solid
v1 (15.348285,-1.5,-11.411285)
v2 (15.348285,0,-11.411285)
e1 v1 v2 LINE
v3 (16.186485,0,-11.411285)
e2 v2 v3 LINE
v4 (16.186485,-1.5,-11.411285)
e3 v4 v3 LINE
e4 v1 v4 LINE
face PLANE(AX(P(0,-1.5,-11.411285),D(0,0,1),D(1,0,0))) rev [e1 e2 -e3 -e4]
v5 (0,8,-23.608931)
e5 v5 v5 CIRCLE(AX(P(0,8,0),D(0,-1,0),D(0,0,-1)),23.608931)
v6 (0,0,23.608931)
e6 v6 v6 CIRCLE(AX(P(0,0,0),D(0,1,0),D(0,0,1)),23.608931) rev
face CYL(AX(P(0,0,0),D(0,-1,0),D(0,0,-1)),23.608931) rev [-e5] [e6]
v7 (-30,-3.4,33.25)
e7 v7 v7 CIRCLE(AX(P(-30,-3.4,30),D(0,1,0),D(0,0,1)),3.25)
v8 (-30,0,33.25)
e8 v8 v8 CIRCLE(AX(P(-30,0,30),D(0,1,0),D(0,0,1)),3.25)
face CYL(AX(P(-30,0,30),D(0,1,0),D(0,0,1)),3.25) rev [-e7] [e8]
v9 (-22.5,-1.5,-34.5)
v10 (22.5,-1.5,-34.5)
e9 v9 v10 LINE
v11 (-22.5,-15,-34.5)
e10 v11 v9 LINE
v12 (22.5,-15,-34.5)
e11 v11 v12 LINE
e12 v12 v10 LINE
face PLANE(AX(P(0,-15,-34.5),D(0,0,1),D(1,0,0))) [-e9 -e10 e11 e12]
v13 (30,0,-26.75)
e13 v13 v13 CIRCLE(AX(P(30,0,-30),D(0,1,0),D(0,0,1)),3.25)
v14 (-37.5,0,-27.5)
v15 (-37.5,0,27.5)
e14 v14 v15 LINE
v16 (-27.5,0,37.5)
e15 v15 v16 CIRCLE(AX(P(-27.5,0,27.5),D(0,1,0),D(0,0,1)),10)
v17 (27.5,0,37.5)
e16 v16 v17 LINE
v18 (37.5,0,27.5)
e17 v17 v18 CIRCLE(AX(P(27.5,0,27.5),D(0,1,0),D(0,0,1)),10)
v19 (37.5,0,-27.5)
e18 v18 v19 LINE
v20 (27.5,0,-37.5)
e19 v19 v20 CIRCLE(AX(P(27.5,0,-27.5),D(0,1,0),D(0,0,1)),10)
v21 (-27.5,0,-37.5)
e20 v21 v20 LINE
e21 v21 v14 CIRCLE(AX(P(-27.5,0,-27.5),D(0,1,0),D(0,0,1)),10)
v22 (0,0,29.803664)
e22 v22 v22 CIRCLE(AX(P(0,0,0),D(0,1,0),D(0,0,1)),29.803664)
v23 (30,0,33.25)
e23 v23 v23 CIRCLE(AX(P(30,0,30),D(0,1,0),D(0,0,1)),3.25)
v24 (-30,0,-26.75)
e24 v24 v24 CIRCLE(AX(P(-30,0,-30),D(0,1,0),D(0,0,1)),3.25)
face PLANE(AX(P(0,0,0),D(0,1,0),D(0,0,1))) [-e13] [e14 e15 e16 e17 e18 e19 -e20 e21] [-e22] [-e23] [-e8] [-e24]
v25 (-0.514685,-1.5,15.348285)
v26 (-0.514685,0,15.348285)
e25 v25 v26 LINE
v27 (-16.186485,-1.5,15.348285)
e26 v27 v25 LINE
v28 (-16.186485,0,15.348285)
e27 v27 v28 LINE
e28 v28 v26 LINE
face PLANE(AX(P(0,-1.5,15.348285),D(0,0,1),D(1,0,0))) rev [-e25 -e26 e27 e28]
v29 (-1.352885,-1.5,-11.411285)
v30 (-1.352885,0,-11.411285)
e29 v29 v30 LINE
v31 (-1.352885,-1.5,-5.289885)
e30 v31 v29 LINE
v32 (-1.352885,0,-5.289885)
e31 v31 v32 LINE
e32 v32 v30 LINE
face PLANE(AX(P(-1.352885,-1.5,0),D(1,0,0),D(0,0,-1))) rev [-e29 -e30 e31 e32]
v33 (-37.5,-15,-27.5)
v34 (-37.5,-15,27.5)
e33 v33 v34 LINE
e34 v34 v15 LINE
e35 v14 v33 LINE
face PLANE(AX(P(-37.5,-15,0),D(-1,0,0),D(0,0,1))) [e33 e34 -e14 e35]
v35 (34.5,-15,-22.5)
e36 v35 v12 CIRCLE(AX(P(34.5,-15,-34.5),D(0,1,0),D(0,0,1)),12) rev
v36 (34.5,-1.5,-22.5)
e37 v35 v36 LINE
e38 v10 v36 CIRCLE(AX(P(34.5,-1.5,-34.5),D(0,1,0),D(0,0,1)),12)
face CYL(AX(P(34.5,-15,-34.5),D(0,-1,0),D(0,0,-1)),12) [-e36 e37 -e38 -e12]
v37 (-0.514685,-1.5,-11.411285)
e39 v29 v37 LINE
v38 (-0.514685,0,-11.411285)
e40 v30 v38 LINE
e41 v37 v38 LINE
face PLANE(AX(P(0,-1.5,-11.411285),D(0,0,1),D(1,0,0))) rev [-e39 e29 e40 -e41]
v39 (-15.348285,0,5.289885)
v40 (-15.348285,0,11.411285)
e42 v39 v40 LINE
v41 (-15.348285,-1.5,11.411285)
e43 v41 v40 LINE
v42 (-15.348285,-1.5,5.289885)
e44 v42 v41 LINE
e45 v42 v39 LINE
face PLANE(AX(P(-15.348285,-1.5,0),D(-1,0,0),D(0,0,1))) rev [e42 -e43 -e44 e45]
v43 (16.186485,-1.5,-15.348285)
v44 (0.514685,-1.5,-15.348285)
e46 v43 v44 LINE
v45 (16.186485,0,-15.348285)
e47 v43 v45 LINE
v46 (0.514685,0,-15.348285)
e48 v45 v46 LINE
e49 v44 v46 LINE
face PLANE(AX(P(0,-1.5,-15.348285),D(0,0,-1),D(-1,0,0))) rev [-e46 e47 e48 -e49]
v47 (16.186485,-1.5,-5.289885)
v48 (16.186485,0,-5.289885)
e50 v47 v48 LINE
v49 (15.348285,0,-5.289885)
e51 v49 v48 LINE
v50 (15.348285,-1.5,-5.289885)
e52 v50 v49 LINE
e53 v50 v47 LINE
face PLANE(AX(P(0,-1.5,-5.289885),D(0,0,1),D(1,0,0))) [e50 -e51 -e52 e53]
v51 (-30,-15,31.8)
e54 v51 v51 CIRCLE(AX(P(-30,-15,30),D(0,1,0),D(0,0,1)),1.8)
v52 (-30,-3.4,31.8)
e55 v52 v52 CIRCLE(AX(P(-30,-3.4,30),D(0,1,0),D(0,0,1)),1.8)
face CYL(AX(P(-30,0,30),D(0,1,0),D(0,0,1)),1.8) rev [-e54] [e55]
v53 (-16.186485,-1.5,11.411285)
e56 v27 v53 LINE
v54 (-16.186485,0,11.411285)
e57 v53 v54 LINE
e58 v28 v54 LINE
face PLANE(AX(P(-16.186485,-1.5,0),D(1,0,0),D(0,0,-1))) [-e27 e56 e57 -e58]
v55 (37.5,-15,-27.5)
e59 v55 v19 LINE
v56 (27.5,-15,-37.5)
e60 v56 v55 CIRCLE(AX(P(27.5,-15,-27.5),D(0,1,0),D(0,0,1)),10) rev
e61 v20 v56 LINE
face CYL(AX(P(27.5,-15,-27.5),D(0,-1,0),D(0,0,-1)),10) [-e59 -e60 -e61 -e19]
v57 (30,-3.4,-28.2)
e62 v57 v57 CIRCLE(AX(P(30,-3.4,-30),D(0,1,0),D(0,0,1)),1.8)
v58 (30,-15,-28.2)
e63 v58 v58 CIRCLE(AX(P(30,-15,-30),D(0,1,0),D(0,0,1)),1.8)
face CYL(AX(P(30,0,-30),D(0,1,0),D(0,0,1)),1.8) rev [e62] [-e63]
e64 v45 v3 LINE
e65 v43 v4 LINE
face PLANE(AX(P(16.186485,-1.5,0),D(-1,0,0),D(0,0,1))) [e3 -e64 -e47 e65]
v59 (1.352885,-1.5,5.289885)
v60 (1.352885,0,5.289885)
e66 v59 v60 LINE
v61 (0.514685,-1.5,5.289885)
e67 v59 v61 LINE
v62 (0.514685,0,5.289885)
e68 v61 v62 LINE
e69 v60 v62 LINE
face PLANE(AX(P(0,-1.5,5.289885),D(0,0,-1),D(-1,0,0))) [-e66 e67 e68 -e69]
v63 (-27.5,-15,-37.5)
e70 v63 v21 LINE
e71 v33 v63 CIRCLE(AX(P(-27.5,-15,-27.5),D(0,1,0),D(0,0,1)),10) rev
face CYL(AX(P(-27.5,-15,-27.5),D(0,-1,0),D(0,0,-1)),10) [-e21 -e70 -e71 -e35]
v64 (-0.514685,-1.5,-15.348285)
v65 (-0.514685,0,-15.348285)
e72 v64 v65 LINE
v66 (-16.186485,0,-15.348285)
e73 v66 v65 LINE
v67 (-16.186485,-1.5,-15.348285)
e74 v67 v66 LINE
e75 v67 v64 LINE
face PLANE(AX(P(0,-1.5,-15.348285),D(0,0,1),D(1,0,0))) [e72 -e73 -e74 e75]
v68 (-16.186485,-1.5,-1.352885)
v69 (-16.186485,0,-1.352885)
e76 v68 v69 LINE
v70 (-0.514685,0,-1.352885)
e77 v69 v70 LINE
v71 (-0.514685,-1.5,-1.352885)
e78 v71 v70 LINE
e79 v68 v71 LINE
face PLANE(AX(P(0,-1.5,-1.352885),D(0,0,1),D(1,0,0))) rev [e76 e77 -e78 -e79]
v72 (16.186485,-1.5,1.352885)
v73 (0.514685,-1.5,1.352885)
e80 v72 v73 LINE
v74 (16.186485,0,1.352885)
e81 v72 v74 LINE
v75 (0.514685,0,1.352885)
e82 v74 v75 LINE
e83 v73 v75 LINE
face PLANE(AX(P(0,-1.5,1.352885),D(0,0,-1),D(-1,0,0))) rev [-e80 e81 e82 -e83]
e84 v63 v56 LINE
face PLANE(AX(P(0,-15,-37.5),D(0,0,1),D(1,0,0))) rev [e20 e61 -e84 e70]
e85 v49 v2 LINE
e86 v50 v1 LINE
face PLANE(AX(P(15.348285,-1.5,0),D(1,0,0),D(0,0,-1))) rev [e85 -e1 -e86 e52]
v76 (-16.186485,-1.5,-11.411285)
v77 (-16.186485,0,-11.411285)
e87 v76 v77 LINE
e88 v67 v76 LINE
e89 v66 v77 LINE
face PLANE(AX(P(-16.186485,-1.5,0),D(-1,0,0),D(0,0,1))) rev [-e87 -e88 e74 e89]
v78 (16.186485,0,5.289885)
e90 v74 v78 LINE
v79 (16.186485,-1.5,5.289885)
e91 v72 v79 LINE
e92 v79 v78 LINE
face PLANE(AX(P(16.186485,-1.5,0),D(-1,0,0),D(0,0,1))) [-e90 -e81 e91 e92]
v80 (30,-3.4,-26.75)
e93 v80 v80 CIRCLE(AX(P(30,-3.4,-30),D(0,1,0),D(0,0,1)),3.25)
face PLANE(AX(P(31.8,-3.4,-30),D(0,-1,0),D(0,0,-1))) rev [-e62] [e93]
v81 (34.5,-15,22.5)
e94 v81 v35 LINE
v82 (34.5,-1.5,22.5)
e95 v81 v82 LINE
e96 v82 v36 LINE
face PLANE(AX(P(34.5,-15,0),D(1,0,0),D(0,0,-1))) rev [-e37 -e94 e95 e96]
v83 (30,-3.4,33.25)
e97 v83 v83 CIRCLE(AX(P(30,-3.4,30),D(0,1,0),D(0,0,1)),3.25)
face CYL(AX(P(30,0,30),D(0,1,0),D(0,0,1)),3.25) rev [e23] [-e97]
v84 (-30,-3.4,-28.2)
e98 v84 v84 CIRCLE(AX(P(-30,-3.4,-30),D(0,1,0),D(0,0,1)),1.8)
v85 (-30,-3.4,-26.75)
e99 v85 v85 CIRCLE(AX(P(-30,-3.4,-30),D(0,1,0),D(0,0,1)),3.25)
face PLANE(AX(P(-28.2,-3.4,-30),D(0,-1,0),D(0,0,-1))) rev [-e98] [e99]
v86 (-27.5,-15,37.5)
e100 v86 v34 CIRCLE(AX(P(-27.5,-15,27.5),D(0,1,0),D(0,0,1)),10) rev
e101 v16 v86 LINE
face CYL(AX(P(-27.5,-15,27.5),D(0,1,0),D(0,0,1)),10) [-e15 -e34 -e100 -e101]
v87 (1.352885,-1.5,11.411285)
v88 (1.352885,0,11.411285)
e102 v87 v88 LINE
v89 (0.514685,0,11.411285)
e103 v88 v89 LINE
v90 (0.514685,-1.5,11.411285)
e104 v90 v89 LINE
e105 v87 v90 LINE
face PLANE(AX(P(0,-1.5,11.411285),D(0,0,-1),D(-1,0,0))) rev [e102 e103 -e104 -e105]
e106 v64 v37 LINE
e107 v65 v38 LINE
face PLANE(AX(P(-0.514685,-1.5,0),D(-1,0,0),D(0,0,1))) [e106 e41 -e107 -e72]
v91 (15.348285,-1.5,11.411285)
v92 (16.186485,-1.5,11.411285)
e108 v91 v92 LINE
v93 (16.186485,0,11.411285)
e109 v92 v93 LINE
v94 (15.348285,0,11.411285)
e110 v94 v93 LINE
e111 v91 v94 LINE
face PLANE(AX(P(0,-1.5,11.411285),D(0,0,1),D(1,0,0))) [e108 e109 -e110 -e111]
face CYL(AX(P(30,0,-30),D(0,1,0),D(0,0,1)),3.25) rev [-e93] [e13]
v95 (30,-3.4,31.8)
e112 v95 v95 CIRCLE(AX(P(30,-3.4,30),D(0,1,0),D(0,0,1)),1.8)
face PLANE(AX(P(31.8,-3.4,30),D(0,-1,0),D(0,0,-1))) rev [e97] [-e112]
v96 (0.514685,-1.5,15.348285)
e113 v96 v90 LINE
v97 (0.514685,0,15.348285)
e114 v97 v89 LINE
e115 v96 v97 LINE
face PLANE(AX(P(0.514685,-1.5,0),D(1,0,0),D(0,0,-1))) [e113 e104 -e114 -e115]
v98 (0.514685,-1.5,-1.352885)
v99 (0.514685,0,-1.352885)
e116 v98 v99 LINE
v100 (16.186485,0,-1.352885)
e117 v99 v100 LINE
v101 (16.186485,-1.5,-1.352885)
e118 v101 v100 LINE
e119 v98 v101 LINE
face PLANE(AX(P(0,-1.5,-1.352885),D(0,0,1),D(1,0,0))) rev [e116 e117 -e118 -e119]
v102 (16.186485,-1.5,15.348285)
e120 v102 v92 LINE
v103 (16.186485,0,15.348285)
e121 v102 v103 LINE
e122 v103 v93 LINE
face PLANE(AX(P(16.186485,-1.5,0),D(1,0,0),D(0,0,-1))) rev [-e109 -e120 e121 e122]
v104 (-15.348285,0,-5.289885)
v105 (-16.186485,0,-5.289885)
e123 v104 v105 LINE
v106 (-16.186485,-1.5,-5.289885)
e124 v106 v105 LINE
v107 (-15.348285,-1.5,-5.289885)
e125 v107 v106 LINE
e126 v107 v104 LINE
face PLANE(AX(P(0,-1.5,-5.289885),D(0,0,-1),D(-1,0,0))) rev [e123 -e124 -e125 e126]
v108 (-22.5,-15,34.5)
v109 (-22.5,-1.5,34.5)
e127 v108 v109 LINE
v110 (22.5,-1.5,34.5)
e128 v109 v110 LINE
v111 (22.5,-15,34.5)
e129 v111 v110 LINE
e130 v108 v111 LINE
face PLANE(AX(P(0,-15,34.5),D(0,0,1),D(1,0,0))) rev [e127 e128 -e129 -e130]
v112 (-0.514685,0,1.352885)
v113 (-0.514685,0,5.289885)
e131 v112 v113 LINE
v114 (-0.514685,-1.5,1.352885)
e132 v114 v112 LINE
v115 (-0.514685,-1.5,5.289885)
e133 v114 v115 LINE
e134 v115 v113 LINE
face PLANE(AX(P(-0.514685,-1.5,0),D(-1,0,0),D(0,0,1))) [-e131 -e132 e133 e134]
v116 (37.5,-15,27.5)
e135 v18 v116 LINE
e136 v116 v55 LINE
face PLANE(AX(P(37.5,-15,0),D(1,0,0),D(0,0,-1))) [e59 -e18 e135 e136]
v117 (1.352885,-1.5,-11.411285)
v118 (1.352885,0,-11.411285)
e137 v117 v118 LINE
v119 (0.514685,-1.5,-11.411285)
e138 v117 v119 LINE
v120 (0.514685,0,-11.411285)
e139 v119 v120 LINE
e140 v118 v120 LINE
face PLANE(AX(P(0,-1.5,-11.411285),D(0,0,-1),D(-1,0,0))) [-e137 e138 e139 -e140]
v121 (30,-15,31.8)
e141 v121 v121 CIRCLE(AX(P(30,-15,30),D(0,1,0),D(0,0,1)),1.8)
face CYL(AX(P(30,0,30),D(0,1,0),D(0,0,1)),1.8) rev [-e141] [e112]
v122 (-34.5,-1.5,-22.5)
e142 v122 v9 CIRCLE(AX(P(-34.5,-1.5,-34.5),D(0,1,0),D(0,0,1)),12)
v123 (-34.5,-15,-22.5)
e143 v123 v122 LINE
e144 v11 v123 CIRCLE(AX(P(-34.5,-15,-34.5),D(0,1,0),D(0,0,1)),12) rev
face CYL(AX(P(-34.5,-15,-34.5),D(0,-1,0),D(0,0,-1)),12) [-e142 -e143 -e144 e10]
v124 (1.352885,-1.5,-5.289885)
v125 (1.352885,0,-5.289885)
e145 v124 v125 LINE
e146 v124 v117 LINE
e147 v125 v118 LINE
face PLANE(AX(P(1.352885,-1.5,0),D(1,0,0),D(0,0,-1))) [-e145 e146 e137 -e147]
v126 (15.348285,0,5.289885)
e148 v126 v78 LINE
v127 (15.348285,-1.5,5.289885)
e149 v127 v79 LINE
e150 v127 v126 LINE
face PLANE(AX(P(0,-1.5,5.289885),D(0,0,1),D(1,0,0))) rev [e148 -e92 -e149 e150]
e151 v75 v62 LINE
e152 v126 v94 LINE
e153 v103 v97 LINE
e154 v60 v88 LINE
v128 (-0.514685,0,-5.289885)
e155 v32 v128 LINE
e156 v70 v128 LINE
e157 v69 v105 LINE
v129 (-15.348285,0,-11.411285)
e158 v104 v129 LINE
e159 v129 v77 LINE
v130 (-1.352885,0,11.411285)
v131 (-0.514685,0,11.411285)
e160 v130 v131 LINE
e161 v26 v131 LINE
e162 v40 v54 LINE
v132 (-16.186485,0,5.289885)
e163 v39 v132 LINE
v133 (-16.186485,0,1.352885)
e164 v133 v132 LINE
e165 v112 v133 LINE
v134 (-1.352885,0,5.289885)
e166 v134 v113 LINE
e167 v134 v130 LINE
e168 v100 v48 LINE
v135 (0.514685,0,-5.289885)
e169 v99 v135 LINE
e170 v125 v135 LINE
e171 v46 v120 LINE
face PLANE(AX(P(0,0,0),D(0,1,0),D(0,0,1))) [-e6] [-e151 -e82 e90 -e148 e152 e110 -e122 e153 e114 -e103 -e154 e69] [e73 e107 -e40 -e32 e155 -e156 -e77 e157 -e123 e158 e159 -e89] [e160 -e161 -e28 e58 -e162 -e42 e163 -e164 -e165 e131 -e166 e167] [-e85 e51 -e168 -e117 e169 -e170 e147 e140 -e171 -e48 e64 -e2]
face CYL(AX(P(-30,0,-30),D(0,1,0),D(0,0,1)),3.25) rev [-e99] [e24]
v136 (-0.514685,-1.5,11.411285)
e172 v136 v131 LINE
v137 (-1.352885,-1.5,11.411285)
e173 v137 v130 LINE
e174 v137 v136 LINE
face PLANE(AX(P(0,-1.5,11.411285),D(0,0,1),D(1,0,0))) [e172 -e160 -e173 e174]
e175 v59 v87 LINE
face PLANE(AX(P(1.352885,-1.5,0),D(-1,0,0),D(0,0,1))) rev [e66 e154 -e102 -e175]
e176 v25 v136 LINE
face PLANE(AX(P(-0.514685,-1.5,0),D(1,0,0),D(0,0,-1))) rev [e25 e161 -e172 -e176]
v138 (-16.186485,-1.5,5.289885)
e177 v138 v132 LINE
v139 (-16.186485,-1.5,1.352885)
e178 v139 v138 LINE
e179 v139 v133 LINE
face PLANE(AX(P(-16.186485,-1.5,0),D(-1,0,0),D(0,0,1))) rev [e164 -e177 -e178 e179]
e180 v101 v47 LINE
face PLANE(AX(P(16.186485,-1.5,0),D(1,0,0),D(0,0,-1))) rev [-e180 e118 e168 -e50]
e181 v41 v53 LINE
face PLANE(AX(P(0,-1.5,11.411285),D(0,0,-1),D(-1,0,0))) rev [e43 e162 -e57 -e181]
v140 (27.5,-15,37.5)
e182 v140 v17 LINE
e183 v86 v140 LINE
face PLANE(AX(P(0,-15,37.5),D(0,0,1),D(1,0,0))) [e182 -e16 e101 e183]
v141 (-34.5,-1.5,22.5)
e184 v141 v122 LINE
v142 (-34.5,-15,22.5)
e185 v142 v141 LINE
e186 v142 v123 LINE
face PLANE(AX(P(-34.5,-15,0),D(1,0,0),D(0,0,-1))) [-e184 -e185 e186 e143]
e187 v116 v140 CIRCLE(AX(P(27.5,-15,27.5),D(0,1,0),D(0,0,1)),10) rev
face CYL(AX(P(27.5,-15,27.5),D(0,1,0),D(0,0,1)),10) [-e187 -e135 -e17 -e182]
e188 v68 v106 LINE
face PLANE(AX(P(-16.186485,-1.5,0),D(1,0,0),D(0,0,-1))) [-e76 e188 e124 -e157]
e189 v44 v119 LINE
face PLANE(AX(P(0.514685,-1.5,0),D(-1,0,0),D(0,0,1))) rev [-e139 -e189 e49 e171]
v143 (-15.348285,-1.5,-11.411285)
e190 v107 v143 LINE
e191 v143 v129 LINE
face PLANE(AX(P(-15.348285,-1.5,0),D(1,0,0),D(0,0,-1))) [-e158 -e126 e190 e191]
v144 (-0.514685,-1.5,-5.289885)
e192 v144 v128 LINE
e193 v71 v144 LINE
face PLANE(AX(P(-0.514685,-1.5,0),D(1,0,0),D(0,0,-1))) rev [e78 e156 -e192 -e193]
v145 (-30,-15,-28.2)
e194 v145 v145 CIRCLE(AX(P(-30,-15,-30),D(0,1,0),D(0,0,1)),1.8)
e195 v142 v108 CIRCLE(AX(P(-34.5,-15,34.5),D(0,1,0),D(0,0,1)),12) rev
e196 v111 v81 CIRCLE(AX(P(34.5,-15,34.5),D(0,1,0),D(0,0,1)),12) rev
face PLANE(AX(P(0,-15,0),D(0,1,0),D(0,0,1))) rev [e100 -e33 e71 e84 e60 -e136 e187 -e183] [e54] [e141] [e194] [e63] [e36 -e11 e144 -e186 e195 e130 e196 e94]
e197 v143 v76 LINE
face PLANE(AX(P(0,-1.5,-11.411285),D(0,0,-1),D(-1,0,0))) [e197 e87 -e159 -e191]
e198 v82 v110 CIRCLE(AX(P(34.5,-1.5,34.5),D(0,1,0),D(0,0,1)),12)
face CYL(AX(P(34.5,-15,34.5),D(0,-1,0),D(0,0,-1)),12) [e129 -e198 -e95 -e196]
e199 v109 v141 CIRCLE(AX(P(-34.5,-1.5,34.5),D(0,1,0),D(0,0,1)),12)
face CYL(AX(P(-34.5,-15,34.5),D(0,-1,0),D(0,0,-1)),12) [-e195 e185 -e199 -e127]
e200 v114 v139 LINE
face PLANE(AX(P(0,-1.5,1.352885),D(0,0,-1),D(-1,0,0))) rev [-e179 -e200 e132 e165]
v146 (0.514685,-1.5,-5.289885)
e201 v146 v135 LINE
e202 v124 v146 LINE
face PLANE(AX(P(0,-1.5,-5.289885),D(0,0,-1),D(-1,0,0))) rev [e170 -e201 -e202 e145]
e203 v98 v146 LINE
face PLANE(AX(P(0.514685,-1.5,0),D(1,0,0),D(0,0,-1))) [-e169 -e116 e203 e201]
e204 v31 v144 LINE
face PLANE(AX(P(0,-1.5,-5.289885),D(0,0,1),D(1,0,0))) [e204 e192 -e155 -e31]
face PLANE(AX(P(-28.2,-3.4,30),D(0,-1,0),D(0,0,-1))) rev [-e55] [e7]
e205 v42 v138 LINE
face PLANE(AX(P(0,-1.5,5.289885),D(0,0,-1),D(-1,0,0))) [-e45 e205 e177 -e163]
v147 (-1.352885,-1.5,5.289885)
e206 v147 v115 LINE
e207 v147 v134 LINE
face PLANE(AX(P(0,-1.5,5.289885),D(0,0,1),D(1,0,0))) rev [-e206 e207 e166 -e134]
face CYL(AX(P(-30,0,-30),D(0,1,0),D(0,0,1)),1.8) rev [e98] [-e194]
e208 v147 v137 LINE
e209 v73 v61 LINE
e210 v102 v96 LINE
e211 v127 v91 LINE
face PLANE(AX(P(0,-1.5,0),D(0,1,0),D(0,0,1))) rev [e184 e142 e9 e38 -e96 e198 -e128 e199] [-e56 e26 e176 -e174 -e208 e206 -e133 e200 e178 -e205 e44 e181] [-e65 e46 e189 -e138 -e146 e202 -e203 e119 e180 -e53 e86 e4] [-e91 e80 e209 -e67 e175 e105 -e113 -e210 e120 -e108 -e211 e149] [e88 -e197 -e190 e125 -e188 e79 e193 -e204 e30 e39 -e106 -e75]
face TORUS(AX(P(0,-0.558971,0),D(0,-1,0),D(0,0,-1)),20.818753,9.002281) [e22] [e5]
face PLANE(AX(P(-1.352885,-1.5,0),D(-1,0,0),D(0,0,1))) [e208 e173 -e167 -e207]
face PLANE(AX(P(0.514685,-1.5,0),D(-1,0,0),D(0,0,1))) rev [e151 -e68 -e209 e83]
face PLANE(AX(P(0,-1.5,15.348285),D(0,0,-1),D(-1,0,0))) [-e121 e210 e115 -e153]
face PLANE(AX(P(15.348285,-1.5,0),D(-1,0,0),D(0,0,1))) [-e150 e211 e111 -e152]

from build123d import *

# Parameters (mm, degrees)
SKIZZE1_R                                            = 1.6
AUFSATZ_LINEAR_AUSTRAGEN1_DEPTH                      = 15
AUFSATZ_LINEAR_AUSTRAGEN2_DEPTH                      = 1.5
VERRUNDUNG1_R                                        = 10
VERRUNDUNG2_R                                        = 12
STIRNSENKUNG_F_R_M3_ZYLINDERSCHRAUBE_MIT_D           = 3.6
STIRNSENKUNG_F_R_M3_ZYLINDERSCHRAUBE_MIT_CBORE_D     = 6.5
STIRNSENKUNG_F_R_M3_ZYLINDERSCHRAUBE_MIT_CBORE_DEPTH = 3.4


with BuildPart() as part:
    # Skizze1 → Aufsatz-Linear austragen1 (new body)
    with BuildSketch(Plane(origin=(0, 0, 0), x_dir=(1, 0, 0), z_dir=(0, 1, 0))):
        Polygon((-37.5, 22.5), (-37.5, -37.5), (37.5, -37.5), (37.5, 37.5), (-35, 37.5), (-37.5, 37.5), align=None)
        with Locations(Location((-30, -30, 0), (0, 0, 270))):
            Circle(SKIZZE1_R, mode=Mode.SUBTRACT)
        with Locations(Location((30, -30, 0), (0, 0, 270))):
            Circle(SKIZZE1_R, mode=Mode.SUBTRACT)
        with Locations(Location((-30, 30, 0), (0, 0, 270))):
            Circle(SKIZZE1_R, mode=Mode.SUBTRACT)
        Polygon((-22.5, 22.5), (-22.5, 34.5), (22.5, 34.5), (22.5, 22.5), (34.5, 22.5), (34.5, -22.5), (22.5, -22.5), (22.5, -34.5), (-22.5, -34.5), (-22.5, -22.5), (-34.5, -22.5), (-34.5, 22.5), align=None, mode=Mode.SUBTRACT)
        with Locations(Location((30, 30, 0), (0, 0, 270))):
            Circle(SKIZZE1_R, mode=Mode.SUBTRACT)
    extrude(amount=-AUFSATZ_LINEAR_AUSTRAGEN1_DEPTH)

    # Skizze1<3> → Aufsatz-Linear austragen2 (add)
    with BuildSketch(Plane(origin=(0, 0, 0), x_dir=(1, 0, 0), z_dir=(0, 1, 0))):
        Polygon((22.5, 34.5), (-22.5, 34.5), (-22.5, 22.5), (-34.5, 22.5), (-34.5, -22.5), (-22.5, -22.5), (-22.5, -34.5), (22.5, -34.5), (22.5, -22.5), (34.5, -22.5), (34.5, 22.5), (22.5, 22.5), align=None)
        Polygon((-0.51468496, -5.28988496), (-1.35288496, -5.28988496), (-1.35288496, -11.41128496), (-0.51468496, -11.41128496), (-0.51468496, -15.34828496), (-1.35288496, -15.34828496), (-15.34828496, -15.34828496), (-16.18648496, -15.34828496), (-16.18648496, -11.41128496), (-15.34828496, -11.41128496), (-15.34828496, -5.28988496), (-16.18648496, -5.28988496), (-16.18648496, -1.35288496), (-15.34828496, -1.35288496), (-1.35288496, -1.35288496), (-0.51468496, -1.35288496), align=None, mode=Mode.SUBTRACT)
        Polygon((15.34828496, -15.34828496), (1.35288496, -15.34828496), (0.51468496, -15.34828496), (0.51468496, -11.41128496), (1.35288496, -11.41128496), (1.35288496, -5.28988496), (0.51468496, -5.28988496), (0.51468496, -1.35288496), (1.35288496, -1.35288496), (15.34828496, -1.35288496), (16.18648496, -1.35288496), (16.18648496, -5.28988496), (15.34828496, -5.28988496), (15.34828496, -11.41128496), (16.18648496, -11.41128496), (16.18648496, -15.34828496), align=None, mode=Mode.SUBTRACT)
        Polygon((-15.34828496, 15.34828496), (-1.35288496, 15.34828496), (-0.51468496, 15.34828496), (-0.51468496, 11.41128496), (-1.35288496, 11.41128496), (-1.35288496, 5.28988496), (-0.51468496, 5.28988496), (-0.51468496, 1.35288496), (-1.35288496, 1.35288496), (-15.34828496, 1.35288496), (-16.18648496, 1.35288496), (-16.18648496, 5.28988496), (-15.34828496, 5.28988496), (-15.34828496, 11.41128496), (-16.18648496, 11.41128496), (-16.18648496, 15.34828496), align=None, mode=Mode.SUBTRACT)
        Polygon((0.51468496, 5.28988496), (1.35288496, 5.28988496), (1.35288496, 11.41128496), (0.51468496, 11.41128496), (0.51468496, 15.34828496), (1.35288496, 15.34828496), (15.34828496, 15.34828496), (16.18648496, 15.34828496), (16.18648496, 11.41128496), (15.34828496, 11.41128496), (15.34828496, 5.28988496), (16.18648496, 5.28988496), (16.18648496, 1.35288496), (15.34828496, 1.35288496), (1.35288496, 1.35288496), (0.51468496, 1.35288496), align=None, mode=Mode.SUBTRACT)
    extrude(amount=-AUFSATZ_LINEAR_AUSTRAGEN2_DEPTH)

    # Verrundung1
    verrundung1_edges = [part.edges().sort_by_distance(p)[0] for p in [
        (37.5, -7.5, -37.5),
        (37.5, -7.5, 37.5),
        (-37.5, -7.5, 37.5),
        (-37.5, -7.5, -37.5),
    ]]
    fillet(verrundung1_edges, radius=VERRUNDUNG1_R)

    # Verrundung2
    verrundung2_edges = [part.edges().sort_by_distance(p)[0] for p in [
        (22.5, -8.25, 22.5),
        (-22.5, -8.25, 22.5),
        (22.5, -8.25, -22.5),
        (-22.5, -8.25, -22.5),
    ]]
    fillet(verrundung2_edges, radius=VERRUNDUNG2_R - 0.0001)  # a hair under: the kernel refuses the full size

    # Skizze3 → Rotation1 (revolve)
    with BuildSketch(Plane(origin=(0, 0, 0), x_dir=(0, 0, -1), z_dir=(1, 0, 0))):
        with BuildLine():
            Line((23.608930659, 0), (29.803663871, 0))
            ThreePointArc((29.803663871, 0), (27.936560085, 4.952643744), (23.608930659, 8))
            Line((23.608930659, 8), (23.608930659, 0))
        make_face()
    revolve(axis=Axis((0, 0, 0), (0, 1, 0)))

    # Stirnsenkung für M3 Zylinderschraube mit Innensechskant1 (through all)
    with Locations(Plane(origin=(0, 0, 0), x_dir=(1, 0, 0), z_dir=(0, 1, 0))):
        with Locations((-30, 30), (30, 30), (-30, -30), (30, -30)):
            CounterBoreHole(STIRNSENKUNG_F_R_M3_ZYLINDERSCHRAUBE_MIT_D / 2, STIRNSENKUNG_F_R_M3_ZYLINDERSCHRAUBE_MIT_CBORE_D / 2, STIRNSENKUNG_F_R_M3_ZYLINDERSCHRAUBE_MIT_CBORE_DEPTH)


solid = part.part
